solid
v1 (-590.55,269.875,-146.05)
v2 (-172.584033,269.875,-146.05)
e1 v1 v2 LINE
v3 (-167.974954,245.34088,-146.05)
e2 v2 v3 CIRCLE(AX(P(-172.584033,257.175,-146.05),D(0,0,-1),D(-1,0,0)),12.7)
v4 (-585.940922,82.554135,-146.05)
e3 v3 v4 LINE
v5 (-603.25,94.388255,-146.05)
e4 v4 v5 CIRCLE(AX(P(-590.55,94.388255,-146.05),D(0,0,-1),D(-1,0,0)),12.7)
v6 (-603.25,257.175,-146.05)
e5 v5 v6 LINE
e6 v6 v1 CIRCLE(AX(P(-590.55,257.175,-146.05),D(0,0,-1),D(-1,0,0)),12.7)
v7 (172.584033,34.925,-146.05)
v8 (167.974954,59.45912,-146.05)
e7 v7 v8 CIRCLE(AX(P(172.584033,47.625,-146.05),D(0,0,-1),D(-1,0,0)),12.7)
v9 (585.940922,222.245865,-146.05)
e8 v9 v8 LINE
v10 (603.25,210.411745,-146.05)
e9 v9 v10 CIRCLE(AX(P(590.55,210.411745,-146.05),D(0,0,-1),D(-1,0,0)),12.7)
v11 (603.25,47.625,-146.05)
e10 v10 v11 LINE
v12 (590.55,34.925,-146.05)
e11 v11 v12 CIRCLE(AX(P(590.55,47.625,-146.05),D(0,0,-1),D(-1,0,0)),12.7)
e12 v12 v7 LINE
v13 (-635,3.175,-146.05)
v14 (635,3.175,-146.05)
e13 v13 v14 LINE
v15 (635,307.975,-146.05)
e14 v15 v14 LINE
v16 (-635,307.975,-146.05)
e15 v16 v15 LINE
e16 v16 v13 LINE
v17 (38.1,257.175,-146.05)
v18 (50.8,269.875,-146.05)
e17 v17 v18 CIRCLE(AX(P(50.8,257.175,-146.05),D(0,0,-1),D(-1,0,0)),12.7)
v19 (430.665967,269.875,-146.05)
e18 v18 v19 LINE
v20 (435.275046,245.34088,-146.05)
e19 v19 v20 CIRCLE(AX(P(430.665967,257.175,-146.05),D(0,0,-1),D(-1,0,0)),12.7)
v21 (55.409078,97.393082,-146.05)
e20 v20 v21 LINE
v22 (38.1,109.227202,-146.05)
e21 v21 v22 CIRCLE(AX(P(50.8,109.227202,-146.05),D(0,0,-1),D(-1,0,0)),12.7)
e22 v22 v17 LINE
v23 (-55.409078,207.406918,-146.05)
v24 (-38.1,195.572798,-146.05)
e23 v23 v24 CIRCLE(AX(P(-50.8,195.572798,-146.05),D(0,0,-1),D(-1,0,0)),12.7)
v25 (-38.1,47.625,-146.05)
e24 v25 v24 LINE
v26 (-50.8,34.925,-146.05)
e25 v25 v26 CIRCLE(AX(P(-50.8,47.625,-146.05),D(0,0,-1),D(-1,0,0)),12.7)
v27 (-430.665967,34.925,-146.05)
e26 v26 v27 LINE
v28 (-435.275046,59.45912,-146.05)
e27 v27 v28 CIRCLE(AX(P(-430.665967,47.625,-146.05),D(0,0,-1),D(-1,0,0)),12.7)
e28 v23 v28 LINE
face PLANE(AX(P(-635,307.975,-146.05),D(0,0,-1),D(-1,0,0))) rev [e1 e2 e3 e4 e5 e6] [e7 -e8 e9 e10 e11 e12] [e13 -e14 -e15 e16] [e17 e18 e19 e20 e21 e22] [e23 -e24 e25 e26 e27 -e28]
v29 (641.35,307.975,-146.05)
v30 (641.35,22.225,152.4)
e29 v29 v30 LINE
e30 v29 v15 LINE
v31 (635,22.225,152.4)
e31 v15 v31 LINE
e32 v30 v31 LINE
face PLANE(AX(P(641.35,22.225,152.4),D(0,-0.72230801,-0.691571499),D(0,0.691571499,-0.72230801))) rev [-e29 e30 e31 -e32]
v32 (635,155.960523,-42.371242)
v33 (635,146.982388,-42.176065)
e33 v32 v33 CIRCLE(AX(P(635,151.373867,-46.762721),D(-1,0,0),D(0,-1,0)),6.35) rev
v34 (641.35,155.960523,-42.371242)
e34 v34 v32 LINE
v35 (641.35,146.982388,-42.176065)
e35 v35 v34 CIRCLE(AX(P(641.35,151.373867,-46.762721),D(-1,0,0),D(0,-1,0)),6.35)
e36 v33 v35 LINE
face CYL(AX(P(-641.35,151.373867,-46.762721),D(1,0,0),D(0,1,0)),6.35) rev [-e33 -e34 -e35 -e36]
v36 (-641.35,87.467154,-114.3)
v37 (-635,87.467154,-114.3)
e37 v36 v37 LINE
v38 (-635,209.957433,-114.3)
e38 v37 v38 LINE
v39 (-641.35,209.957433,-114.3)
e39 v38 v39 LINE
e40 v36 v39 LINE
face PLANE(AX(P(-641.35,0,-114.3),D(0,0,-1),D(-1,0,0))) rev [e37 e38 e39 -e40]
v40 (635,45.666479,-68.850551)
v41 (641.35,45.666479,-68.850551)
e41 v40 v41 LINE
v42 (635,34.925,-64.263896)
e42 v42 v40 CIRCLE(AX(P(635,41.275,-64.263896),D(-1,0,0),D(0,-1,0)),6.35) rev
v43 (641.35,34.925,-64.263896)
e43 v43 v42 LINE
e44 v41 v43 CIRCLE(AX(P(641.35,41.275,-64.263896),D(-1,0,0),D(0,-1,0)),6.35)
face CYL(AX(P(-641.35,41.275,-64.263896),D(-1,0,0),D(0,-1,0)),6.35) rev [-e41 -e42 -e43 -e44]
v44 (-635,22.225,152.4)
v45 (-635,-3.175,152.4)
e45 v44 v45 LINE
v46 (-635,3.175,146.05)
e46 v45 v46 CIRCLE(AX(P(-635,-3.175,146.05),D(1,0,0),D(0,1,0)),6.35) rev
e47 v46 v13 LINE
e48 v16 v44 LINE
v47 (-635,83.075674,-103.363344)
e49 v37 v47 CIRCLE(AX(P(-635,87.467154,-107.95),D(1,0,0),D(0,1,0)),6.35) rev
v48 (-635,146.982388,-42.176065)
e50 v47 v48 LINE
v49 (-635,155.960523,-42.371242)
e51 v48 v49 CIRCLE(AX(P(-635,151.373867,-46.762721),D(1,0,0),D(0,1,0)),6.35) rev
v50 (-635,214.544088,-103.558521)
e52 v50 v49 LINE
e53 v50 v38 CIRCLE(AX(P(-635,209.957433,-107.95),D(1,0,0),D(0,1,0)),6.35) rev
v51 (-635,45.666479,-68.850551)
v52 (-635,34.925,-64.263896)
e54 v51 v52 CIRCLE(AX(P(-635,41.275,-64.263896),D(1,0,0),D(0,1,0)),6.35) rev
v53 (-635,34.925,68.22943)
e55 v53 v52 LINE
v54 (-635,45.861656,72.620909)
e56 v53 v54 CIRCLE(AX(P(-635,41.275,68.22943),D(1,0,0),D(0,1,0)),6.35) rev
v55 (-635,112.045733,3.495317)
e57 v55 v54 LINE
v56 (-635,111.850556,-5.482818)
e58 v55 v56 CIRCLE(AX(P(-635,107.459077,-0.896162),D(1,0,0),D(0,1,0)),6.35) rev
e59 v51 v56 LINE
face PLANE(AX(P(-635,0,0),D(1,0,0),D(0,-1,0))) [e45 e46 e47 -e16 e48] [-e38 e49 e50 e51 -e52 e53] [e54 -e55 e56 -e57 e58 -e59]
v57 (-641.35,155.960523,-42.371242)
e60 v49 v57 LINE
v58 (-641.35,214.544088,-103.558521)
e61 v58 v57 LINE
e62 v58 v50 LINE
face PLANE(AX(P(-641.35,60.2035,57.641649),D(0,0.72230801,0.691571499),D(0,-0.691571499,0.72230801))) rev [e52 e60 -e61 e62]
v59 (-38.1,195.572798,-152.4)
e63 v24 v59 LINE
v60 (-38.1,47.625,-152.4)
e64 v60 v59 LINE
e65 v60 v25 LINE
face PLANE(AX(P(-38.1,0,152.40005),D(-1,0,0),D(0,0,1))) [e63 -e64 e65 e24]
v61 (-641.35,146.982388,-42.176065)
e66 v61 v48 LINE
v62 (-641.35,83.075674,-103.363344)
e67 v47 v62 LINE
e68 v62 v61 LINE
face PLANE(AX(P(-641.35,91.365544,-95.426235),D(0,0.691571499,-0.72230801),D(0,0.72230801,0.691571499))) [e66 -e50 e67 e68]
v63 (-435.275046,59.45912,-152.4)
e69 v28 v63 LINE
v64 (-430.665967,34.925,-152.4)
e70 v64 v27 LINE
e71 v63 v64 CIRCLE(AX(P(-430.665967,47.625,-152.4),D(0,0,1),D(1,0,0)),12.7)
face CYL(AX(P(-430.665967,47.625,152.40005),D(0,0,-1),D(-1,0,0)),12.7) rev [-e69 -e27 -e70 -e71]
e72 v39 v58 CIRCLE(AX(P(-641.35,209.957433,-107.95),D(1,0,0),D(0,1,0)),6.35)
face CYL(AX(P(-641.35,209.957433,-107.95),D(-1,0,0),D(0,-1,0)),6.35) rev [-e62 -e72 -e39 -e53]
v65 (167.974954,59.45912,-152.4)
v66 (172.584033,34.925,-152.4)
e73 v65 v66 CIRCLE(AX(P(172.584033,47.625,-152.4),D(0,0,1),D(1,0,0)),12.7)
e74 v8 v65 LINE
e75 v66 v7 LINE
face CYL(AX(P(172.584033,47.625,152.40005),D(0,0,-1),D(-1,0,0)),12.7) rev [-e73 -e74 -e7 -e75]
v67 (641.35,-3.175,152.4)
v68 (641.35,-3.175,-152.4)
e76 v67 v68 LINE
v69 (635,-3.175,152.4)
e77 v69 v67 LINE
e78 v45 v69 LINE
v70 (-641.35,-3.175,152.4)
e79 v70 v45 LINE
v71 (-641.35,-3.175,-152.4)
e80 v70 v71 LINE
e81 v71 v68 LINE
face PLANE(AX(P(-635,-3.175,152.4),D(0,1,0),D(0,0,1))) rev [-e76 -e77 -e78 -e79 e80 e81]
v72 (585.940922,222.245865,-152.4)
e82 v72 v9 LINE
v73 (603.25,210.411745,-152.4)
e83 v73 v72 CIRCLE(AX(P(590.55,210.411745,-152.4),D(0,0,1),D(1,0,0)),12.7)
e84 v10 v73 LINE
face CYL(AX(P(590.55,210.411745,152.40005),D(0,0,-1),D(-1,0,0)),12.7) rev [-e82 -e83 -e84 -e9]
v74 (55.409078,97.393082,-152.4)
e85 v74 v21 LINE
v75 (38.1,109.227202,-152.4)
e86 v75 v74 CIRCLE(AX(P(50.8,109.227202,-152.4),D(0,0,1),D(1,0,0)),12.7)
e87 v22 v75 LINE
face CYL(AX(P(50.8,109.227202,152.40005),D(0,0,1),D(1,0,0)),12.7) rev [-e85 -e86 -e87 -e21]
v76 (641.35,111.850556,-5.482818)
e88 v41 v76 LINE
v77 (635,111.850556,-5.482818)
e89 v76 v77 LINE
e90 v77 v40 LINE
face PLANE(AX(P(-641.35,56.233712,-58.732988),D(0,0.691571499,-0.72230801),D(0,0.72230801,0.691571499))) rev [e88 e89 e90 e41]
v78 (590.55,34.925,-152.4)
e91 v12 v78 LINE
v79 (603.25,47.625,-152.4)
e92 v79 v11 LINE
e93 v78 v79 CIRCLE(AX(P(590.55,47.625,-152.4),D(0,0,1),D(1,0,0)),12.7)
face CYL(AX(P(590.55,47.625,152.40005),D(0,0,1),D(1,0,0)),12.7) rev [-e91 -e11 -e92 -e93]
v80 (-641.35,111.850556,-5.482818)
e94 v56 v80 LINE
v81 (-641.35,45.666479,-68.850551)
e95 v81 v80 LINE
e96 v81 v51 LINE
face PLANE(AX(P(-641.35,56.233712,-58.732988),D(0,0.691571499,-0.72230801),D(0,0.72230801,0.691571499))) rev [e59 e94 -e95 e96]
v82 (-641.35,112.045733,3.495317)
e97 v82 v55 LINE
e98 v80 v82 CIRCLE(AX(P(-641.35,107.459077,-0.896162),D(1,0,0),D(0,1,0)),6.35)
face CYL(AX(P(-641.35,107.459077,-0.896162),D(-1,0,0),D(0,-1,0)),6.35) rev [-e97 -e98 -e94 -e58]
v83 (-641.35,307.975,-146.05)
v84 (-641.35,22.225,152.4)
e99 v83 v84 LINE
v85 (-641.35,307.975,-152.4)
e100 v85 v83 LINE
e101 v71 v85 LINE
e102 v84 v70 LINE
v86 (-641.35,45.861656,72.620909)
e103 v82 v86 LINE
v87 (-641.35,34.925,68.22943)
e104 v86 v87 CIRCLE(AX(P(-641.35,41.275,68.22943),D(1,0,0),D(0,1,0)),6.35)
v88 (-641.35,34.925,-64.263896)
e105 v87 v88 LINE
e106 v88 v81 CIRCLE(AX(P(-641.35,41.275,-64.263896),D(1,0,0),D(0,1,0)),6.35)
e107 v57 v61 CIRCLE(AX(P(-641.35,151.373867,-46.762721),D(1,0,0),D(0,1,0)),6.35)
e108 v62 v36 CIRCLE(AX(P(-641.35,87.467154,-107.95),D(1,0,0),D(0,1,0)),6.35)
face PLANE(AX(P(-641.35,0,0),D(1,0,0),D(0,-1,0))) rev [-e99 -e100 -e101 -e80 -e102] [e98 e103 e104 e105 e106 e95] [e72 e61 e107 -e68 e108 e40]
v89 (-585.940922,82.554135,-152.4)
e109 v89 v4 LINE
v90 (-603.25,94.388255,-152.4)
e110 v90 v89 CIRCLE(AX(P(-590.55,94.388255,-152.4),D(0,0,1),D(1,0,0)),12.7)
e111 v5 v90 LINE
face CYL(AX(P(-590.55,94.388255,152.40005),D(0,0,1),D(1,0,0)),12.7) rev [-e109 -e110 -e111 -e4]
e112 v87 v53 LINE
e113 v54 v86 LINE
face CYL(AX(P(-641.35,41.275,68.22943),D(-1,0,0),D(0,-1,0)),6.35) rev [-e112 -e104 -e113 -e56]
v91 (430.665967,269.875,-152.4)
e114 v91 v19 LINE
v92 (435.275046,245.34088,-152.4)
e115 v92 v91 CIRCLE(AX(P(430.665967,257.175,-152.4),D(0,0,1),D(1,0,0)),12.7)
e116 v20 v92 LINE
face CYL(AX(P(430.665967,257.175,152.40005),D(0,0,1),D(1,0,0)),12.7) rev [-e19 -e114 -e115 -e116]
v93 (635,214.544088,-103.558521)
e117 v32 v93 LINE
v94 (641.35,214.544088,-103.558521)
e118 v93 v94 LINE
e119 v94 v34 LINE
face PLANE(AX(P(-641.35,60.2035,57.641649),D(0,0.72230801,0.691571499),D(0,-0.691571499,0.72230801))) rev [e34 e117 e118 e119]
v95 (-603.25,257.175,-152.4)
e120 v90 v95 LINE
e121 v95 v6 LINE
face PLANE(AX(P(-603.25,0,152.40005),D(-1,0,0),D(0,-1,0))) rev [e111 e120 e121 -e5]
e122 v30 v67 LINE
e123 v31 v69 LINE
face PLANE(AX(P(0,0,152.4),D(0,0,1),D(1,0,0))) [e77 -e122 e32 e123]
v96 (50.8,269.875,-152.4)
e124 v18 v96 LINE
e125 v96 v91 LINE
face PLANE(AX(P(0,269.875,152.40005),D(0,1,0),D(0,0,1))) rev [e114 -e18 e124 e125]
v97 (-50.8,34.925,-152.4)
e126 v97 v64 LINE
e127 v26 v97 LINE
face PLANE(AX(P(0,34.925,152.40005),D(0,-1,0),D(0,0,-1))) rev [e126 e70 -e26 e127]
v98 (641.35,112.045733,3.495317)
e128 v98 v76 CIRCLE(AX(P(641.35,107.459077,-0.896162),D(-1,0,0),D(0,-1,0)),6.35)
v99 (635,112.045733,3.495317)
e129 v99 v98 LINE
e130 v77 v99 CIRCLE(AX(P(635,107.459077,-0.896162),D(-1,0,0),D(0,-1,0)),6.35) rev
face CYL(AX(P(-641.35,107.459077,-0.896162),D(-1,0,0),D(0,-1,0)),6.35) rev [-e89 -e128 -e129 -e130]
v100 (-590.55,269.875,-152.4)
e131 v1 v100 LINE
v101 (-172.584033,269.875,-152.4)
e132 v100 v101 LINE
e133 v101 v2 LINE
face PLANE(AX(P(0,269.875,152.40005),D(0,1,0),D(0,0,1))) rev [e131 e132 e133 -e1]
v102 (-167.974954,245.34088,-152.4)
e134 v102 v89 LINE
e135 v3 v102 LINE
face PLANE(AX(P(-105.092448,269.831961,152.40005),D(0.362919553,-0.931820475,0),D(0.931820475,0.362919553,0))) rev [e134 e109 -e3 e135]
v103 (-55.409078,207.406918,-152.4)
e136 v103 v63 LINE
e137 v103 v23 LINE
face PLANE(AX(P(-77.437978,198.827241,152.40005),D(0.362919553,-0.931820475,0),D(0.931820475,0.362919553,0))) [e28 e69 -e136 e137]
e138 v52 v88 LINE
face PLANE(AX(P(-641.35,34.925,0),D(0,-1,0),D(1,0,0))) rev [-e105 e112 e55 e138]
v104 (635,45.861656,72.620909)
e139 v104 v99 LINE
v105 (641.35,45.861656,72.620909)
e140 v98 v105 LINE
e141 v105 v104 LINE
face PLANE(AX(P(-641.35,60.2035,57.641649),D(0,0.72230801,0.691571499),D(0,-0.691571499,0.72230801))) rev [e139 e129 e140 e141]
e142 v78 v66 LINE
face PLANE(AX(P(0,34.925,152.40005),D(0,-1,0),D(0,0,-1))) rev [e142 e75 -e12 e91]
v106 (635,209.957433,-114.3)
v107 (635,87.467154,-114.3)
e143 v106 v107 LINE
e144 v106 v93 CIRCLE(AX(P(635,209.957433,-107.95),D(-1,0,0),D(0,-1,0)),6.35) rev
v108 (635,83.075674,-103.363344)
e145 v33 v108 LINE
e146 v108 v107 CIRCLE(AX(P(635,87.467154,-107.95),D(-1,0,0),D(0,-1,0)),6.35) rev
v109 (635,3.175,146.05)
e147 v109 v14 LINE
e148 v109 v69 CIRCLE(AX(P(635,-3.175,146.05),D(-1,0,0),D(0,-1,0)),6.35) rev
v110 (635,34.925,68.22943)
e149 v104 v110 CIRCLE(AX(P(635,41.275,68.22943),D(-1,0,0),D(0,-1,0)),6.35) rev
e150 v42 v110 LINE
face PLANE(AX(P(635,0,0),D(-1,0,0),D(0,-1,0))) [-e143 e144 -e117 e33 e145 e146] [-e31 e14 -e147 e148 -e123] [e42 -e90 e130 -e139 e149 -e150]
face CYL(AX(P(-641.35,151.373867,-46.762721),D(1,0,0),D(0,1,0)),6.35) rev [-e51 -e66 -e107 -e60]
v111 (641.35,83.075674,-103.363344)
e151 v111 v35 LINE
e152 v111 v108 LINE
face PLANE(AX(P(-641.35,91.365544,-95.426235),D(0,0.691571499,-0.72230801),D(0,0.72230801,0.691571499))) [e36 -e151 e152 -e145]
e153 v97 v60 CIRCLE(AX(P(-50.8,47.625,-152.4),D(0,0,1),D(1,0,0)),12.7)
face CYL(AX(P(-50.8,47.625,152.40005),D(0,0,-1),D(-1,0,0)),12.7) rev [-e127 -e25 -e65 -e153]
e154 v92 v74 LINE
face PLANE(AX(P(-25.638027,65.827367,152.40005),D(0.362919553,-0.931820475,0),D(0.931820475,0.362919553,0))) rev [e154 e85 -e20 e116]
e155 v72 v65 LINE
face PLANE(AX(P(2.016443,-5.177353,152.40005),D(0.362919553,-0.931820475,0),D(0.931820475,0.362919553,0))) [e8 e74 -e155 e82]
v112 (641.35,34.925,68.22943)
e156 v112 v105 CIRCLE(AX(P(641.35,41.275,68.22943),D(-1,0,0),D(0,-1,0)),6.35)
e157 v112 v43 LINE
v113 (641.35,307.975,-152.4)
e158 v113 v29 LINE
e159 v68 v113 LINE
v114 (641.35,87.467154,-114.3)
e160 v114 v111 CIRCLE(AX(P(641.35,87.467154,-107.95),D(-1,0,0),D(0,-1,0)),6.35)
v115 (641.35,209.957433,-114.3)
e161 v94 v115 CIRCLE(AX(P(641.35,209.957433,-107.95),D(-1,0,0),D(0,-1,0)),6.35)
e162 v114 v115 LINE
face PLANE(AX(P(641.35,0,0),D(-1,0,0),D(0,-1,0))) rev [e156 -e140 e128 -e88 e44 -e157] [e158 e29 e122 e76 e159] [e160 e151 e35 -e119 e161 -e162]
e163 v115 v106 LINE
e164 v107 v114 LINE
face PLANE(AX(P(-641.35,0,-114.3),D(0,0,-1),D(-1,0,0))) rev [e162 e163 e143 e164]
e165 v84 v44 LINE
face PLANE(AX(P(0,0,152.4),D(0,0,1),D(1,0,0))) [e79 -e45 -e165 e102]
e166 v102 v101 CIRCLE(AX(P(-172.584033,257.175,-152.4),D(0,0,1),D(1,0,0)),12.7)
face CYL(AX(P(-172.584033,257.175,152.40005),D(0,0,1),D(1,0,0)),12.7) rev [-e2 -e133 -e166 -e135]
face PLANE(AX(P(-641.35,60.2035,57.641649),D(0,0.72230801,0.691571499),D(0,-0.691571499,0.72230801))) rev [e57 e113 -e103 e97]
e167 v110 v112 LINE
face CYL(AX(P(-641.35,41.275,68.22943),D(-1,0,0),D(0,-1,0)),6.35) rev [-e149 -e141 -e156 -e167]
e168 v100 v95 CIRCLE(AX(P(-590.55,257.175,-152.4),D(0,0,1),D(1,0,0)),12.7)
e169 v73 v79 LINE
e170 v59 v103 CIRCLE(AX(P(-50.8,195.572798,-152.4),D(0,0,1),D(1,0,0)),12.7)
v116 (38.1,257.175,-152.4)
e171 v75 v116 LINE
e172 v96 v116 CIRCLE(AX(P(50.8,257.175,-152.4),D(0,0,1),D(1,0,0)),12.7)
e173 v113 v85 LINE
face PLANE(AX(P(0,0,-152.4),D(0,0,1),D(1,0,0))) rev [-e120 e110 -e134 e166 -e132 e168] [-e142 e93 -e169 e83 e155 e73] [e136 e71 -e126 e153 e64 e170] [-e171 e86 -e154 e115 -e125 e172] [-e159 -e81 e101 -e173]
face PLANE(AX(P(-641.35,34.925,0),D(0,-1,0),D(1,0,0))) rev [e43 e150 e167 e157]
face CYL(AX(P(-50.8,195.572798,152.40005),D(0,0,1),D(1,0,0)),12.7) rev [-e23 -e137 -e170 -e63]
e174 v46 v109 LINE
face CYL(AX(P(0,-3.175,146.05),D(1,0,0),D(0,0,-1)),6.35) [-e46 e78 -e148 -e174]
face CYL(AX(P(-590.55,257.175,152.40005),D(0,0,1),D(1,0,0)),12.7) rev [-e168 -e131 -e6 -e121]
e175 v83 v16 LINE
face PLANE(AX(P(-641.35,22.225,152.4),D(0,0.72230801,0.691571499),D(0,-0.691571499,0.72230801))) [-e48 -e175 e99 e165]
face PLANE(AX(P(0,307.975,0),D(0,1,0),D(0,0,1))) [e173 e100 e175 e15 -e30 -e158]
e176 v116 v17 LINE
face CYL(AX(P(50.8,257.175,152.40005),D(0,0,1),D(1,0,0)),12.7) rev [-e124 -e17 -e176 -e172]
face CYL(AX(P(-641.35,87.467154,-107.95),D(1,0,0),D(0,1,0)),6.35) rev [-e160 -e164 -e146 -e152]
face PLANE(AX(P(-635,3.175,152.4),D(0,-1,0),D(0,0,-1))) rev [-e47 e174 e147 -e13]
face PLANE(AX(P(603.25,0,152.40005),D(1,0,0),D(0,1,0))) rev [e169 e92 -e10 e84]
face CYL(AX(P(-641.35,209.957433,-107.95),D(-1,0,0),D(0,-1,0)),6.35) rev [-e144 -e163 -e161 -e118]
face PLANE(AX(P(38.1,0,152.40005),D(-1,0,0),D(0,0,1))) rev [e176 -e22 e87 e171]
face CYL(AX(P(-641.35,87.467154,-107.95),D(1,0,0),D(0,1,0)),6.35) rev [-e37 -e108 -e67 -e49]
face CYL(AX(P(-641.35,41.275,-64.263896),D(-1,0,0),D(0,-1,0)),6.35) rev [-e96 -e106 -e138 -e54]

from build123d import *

# Parameters (mm, degrees)
SKETCH1_W           = 1270
SKETCH1_H           = 6.35
BOSS_EXTRUDE1_DEPTH = 152.4
SKETCH2_W           = 1270
SKETCH2_H           = 6.35
BOSS_EXTRUDE2_DEPTH = 304.8
BOSS_EXTRUDE3_DEPTH = 6.35
CUT_EXTRUDE1_DEPTH  = 1328.92833038
FILLET1_R           = 6.35
FILLET2_R           = 6.35
CUT_EXTRUDE2_DEPTH  = 775.003529142
FILLET3_R           = 12.7
FILLET4_R           = 6.35


with BuildPart() as part:
    # Sketch1 → Boss-Extrude1 (new, symmetric)
    with BuildSketch(Plane.XY):
        Rectangle(SKETCH1_W, SKETCH1_H)
    extrude(amount=BOSS_EXTRUDE1_DEPTH, both=True)

    # Sketch2 → Boss-Extrude2 (add)
    with BuildSketch(Plane(origin=(0, 3.175, 0), x_dir=(1, 0, 0), z_dir=(0, 1, 0))):
        with Locations((0, 149.225)):
            Rectangle(SKETCH2_W, SKETCH2_H)
    extrude(amount=BOSS_EXTRUDE2_DEPTH)

    # Sketch3 → Boss-Extrude3 (add)
    with BuildSketch(Plane(origin=(635, 0, 0), x_dir=(0, 0, -1), z_dir=(1, 0, 0))):
        Polygon((152.4, -3.175), (-152.4, -3.175), (-152.4, 22.225), (146.05, 307.975), (152.4, 307.975), align=None)
    boss_extrude3 = extrude(amount=BOSS_EXTRUDE3_DEPTH)

    # Mirror1: Boss-Extrude3 across plane
    add(boss_extrude3.mirror(Plane(origin=(0, 0, 0), x_dir=(0, 0, 1), z_dir=(1, 0, 0))))

    # Sketch4 → Cut-Extrude1 (cut, through all)
    with BuildSketch(Plane(origin=(641.35, 0, 0), x_dir=(0, 0, -1), z_dir=(1, 0, 0))):
        Polygon((-84.04363802, 34.925), (79.134946254, 34.925), (1.09133899, 116.437212031), align=None)
        Polygon((37.784585908, 151.569044186), (114.3, 71.652945024), (114.3, 224.82848321), align=None)
    extrude(amount=-CUT_EXTRUDE1_DEPTH, mode=Mode.SUBTRACT)

    # Fillet1
    fillet1_edges = [part.edges().sort_by_distance(p)[0] for p in [
        (638.175, 34.925, -79.134946254),
        (638.175, 34.925, 84.04363802),
        (638.175, 116.437212031, -1.09133899),
        (638.175, 71.652945024, -114.3),
        (638.175, 151.569044186, -37.784585908),
        (638.175, 224.82848321, -114.3),
    ]]
    fillet(fillet1_edges, radius=FILLET1_R)

    # Fillet2
    fillet2_edges = [part.edges().sort_by_distance(p)[0] for p in [
        (-638.175, 34.925, -79.134946254),
        (-638.175, 34.925, 84.04363802),
        (-638.175, 116.437212031, -1.09133899),
        (-638.175, 71.652945024, -114.3),
        (-638.175, 151.569044186, -37.784585908),
        (-638.175, 224.82848321, -114.3),
    ]]
    fillet(fillet2_edges, radius=FILLET2_R)

    # Sketch5 → Cut-Extrude2 (cut, through all)
    with BuildSketch(Plane(origin=(0, 0, -152.4), x_dir=(-1, 0, 0), z_dir=(0, 0, -1))):
        Polygon((-38.1, 269.875), (-498.26805665, 269.875), (-38.1, 90.65165162), align=None)
        Polygon((-104.98194335, 34.925), (-603.25, 228.987295748), (-603.25, 34.925), align=None)
        Polygon((38.1, 214.14834838), (38.1, 34.925), (498.26805665, 34.925), align=None)
        Polygon((603.25, 269.875), (104.98194335, 269.875), (603.25, 75.812704252), align=None)
    extrude(amount=-CUT_EXTRUDE2_DEPTH, mode=Mode.SUBTRACT)

    # Fillet3
    fillet3_edges = [part.edges().sort_by_distance(p)[0] for p in [
        (38.1, 90.65165162, -149.225),
        (498.26805665, 269.875, -149.225),
        (38.1, 269.875, -149.225),
        (603.25, 34.925, -149.225),
        (603.25, 228.987295748, -149.225),
        (104.98194335, 34.925, -149.225),
        (-38.1, 214.14834838, -149.225),
        (-498.26805665, 34.925, -149.225),
        (-38.1, 34.925, -149.225),
        (-104.98194335, 269.875, -149.225),
        (-603.25, 269.875, -149.225),
        (-603.25, 75.812704252, -149.225),
    ]]
    fillet(fillet3_edges, radius=FILLET3_R)

    # Fillet4
    fillet4_edges = [part.edges().sort_by_distance(p)[0] for p in [
        (0, 3.175, 152.4),
    ]]
    fillet(fillet4_edges, radius=FILLET4_R - 0.0001)  # a hair under: the kernel refuses the full size


solid = part.part
